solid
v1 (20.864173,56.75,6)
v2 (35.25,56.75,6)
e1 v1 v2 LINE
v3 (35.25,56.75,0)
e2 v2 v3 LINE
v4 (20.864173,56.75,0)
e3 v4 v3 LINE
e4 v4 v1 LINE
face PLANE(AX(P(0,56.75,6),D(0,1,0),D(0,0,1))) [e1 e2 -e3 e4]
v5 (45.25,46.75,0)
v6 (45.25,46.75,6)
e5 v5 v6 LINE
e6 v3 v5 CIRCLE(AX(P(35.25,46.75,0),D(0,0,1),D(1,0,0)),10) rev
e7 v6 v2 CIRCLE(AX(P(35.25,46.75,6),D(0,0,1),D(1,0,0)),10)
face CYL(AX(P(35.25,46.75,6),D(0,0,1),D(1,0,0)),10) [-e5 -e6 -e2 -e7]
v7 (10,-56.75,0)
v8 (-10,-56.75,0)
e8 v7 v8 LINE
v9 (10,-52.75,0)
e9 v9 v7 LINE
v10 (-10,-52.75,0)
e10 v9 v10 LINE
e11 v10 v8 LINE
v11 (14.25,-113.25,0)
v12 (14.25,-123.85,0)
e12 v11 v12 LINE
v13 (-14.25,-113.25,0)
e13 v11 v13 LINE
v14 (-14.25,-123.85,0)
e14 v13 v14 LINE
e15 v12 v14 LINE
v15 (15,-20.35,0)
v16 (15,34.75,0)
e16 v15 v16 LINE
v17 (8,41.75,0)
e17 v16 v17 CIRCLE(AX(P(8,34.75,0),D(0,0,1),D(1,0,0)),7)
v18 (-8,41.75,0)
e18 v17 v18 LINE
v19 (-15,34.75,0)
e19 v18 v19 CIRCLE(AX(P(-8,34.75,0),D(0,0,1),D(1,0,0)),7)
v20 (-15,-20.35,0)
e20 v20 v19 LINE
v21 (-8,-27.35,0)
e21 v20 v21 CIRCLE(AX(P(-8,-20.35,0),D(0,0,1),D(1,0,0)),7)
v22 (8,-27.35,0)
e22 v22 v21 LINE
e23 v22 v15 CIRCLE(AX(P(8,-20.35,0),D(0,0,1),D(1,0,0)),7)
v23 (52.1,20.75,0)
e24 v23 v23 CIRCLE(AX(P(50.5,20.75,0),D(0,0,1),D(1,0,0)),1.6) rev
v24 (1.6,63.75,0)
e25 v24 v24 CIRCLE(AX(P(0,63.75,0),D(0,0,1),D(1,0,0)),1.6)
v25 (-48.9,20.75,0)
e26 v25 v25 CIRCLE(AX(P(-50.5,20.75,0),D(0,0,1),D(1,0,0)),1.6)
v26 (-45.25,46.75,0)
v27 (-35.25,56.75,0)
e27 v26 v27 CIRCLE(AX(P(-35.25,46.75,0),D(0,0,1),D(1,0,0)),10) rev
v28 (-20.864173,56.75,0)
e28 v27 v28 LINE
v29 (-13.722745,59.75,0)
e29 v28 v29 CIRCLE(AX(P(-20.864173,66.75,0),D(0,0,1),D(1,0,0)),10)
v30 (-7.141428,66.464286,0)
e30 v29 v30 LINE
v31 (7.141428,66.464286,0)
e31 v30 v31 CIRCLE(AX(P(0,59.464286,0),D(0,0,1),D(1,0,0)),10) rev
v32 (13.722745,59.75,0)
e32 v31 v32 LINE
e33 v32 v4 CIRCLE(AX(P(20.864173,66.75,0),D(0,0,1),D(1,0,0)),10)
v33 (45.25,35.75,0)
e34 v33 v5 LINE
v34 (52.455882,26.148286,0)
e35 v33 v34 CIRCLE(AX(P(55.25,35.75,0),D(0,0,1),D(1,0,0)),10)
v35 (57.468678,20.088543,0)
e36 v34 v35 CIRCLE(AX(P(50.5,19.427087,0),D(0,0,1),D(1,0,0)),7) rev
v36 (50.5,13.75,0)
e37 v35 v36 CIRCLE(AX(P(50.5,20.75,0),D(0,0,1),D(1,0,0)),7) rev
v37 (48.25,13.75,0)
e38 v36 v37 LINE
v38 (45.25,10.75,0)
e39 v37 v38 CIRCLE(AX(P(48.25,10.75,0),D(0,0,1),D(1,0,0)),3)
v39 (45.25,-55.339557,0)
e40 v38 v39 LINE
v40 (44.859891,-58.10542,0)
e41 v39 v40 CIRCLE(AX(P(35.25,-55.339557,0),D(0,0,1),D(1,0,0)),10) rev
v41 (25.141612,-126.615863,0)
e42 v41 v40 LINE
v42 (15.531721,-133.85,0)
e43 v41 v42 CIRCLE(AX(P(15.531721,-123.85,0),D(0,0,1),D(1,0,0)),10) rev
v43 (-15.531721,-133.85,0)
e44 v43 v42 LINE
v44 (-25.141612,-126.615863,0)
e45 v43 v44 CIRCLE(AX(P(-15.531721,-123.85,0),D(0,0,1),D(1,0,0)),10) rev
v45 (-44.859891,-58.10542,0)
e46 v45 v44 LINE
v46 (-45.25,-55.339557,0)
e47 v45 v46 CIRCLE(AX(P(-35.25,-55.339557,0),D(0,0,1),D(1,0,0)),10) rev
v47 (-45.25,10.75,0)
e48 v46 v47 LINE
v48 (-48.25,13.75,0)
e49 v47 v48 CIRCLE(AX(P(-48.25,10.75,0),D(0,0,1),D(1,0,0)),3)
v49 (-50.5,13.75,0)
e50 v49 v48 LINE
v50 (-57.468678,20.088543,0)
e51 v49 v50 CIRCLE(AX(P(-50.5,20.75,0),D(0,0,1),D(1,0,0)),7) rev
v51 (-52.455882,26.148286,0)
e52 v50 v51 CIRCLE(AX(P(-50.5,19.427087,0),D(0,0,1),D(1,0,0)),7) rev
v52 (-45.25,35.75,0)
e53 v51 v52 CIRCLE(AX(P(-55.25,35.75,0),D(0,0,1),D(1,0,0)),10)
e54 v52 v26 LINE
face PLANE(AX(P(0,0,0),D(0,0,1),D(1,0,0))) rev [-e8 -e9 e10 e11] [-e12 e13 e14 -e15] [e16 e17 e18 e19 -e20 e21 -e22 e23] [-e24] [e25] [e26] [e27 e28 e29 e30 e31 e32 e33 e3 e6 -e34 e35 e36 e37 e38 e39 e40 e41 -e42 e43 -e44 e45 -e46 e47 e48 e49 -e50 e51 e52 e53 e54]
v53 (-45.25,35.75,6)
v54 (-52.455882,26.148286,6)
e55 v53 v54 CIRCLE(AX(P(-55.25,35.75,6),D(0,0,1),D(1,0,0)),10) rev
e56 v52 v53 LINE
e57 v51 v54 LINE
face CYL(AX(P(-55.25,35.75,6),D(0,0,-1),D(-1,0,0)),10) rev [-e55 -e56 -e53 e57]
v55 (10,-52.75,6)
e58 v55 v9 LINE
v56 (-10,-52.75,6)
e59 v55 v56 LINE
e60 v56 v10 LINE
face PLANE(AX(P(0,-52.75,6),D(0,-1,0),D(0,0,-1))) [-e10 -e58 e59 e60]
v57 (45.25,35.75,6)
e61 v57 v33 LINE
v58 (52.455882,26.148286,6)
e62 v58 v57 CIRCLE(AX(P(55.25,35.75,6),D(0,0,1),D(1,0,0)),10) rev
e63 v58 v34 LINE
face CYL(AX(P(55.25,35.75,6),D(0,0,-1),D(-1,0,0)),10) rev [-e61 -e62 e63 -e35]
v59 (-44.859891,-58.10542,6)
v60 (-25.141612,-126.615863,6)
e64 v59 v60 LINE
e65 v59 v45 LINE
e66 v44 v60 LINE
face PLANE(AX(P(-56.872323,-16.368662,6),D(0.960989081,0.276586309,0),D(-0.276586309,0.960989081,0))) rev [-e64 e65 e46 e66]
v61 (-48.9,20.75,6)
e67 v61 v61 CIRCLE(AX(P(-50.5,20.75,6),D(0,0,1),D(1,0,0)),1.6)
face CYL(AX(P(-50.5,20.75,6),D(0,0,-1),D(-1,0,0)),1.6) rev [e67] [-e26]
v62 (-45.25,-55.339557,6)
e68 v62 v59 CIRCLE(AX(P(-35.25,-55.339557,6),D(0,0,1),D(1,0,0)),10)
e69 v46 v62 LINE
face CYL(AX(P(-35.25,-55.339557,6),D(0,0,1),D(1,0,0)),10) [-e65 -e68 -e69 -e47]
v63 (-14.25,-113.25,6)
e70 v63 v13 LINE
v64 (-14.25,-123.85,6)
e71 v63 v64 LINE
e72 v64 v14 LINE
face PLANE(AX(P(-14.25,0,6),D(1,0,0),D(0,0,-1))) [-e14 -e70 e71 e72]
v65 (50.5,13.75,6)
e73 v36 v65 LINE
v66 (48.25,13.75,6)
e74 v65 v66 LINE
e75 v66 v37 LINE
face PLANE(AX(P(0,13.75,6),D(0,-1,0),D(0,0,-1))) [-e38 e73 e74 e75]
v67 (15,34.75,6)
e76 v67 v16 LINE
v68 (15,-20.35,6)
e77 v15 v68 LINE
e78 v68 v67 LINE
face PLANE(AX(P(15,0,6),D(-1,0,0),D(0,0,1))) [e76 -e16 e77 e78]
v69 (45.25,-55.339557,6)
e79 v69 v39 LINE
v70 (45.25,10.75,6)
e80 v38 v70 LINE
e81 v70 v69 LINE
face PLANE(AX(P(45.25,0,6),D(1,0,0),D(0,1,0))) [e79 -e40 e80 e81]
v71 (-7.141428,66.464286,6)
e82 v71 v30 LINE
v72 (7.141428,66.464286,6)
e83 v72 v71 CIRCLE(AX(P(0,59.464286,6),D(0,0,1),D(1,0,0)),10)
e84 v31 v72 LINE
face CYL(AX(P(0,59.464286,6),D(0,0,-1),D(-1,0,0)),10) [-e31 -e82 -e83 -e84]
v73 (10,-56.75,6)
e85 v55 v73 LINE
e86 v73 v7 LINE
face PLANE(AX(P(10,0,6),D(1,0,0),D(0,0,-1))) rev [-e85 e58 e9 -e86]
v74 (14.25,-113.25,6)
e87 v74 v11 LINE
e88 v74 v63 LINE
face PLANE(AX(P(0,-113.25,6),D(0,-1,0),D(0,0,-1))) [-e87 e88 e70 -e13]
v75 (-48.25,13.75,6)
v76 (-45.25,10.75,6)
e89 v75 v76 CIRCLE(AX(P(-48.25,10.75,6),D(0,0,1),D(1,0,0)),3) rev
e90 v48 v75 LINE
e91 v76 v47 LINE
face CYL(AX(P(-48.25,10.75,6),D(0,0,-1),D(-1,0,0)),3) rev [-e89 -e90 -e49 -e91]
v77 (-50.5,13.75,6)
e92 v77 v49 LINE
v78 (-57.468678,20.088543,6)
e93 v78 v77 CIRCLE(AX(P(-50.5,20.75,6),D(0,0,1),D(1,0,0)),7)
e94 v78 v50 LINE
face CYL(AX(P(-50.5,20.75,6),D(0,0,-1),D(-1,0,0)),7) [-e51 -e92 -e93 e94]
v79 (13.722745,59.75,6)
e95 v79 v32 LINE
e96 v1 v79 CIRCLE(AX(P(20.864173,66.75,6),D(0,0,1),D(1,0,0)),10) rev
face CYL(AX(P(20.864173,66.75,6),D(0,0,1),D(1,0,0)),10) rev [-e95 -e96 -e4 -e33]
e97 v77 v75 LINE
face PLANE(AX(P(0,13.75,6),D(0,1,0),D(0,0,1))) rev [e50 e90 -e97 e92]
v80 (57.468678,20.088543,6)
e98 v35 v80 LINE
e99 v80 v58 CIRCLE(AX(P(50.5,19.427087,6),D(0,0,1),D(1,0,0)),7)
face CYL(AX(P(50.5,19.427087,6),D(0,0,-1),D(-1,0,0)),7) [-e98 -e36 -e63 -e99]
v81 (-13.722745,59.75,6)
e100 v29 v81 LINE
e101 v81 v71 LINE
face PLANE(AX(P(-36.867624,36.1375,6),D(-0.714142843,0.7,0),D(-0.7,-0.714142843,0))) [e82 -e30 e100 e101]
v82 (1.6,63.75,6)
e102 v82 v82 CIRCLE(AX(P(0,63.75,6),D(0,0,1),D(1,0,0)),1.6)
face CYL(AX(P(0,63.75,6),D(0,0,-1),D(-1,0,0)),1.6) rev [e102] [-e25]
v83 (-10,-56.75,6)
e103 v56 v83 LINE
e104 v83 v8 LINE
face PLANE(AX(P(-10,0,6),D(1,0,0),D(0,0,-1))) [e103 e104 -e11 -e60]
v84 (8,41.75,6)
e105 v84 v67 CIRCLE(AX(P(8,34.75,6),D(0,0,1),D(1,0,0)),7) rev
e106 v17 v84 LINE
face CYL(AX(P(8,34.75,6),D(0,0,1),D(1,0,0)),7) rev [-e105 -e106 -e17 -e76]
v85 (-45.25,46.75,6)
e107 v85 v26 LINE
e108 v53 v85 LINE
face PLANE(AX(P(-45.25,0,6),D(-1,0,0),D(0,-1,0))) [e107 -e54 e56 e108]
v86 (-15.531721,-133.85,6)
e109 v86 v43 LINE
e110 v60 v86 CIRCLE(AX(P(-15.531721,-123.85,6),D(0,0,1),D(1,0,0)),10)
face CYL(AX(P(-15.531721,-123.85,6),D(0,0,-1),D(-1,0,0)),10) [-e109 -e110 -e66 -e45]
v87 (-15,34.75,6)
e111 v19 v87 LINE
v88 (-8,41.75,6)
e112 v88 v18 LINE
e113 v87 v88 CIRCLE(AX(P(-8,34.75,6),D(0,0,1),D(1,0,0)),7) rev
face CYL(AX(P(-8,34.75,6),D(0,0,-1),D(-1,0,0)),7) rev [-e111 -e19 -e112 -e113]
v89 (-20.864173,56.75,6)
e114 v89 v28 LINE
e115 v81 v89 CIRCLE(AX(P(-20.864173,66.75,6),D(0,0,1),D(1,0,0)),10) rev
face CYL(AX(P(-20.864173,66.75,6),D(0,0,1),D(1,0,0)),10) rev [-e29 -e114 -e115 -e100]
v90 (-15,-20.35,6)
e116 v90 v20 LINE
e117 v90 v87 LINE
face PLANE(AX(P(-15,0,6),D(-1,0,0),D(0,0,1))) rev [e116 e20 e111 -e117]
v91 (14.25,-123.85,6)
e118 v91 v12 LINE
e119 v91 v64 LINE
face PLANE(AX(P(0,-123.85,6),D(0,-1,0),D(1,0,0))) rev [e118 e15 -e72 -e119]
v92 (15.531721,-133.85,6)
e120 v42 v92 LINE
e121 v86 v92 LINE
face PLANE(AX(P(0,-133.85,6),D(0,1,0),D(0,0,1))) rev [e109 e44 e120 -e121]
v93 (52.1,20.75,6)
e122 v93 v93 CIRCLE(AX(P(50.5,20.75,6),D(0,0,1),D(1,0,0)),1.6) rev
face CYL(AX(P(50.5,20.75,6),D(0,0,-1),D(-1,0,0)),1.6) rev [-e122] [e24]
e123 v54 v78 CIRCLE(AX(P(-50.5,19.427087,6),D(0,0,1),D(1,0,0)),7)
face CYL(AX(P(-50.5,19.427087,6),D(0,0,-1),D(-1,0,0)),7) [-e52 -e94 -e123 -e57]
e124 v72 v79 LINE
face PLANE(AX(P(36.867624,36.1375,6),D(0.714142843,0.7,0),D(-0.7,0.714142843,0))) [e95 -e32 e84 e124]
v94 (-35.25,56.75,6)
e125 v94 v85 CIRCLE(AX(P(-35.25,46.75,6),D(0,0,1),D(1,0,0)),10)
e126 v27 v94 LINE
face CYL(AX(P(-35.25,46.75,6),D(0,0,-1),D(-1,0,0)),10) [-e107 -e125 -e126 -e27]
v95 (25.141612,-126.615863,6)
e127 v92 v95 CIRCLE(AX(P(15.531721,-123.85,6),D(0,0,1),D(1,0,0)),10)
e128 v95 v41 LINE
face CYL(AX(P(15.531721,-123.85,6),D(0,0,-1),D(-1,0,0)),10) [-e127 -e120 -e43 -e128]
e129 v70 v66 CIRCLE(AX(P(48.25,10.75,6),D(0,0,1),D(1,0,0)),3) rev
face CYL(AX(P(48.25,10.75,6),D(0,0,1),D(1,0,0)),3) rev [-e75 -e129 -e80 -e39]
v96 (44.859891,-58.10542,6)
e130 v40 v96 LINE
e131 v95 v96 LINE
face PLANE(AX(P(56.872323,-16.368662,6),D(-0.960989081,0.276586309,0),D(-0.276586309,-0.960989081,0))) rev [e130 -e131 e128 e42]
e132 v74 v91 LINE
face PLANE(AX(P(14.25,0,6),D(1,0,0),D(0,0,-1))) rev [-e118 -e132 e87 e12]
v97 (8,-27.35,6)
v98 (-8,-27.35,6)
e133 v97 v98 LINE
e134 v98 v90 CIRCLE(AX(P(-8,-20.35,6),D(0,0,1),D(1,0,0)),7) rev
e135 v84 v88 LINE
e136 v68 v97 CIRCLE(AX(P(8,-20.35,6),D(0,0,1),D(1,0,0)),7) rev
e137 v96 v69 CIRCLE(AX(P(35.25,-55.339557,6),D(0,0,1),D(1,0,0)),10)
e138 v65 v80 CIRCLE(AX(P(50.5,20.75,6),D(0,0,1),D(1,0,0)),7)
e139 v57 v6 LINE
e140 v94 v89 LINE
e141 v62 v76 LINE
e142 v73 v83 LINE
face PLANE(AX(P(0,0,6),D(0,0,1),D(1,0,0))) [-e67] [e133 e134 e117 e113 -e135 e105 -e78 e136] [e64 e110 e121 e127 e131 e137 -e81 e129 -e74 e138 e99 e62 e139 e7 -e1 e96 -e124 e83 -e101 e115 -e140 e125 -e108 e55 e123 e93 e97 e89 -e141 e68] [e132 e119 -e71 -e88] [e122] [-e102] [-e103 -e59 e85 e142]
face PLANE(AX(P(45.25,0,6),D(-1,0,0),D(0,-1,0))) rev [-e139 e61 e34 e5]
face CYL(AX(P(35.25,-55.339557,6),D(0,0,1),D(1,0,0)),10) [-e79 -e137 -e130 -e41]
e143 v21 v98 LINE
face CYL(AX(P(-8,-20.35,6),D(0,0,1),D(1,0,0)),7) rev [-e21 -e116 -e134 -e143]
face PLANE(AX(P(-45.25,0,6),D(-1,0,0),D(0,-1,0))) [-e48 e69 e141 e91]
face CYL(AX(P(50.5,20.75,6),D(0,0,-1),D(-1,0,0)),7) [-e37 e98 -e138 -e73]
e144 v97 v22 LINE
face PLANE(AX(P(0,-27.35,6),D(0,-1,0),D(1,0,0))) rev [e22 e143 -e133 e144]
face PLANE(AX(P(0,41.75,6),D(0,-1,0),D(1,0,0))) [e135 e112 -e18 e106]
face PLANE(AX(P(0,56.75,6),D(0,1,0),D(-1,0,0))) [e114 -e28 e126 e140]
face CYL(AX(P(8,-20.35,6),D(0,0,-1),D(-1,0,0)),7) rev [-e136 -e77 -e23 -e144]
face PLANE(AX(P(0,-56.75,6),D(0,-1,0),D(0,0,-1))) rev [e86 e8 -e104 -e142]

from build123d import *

# Parameters (mm, degrees)
ESBO_O1_R                = 1.6
ESBO_O1_W                = 28.5
ESBO_O1_H                = 10.6
ESBO_O1_W_2              = 30
ESBO_O1_H_2              = 69.1
ESBO_O1_W_3              = 20
ESBO_O1_H_3              = 4
RESSALTO_EXTRUS_O1_DEPTH = 6
FILETE3_R                = 3
FILETE4_R                = 10
FILETE5_R                = 7


with BuildPart() as part:
    # Esboço1 → Ressalto-extrusão1 (new body)
    with BuildSketch(Plane.XY):
        Polygon((-45.25, -56.75), (-23.05952475, -133.85), (23.05952475, -133.85), (45.25, -56.75), (45.25, 13.75), (57.5, 13.75), (57.5, 25.75), (45.25, 25.75), (45.25, 56.75), (16.663333, 56.75), (0, 73.75), (-16.663333, 56.75), (-45.25, 56.75), (-45.25, 25.75), (-57.5, 25.75), (-57.5, 13.75), (-45.25, 13.75), align=None)
        with Locations((0, 63.75)):
            Circle(ESBO_O1_R, mode=Mode.SUBTRACT)
        with Locations((-50.5, 20.75)):
            Circle(ESBO_O1_R, mode=Mode.SUBTRACT)
        with Locations((50.5, 20.75)):
            Circle(ESBO_O1_R, mode=Mode.SUBTRACT)
        with Locations((0, -118.55)):
            Rectangle(ESBO_O1_W, ESBO_O1_H, mode=Mode.SUBTRACT)
        with Locations((0, 7.2)):
            Rectangle(ESBO_O1_W_2, ESBO_O1_H_2, mode=Mode.SUBTRACT)
        with Locations((0, -54.75)):
            Rectangle(ESBO_O1_W_3, ESBO_O1_H_3, mode=Mode.SUBTRACT)
    extrude(amount=RESSALTO_EXTRUS_O1_DEPTH)

    # Filete3
    filete3_edges = [part.edges().sort_by_distance(p)[0] for p in [
        (-45.25, 13.75, 3),
        (45.25, 13.75, 3),
    ]]
    fillet(filete3_edges, radius=FILETE3_R)

    # Filete4
    filete4_edges = [part.edges().sort_by_distance(p)[0] for p in [
        (-45.25, 25.75, 3),
        (-45.25, 56.75, 3),
        (-16.663333, 56.75, 3),
        (0, 73.75, 3),
        (16.663333, 56.75, 3),
        (45.25, 56.75, 3),
        (45.25, 25.75, 3),
        (45.25, -56.75, 3),
        (23.05952475, -133.85, 3),
        (-23.05952475, -133.85, 3),
        (-45.25, -56.75, 3),
    ]]
    fillet(filete4_edges, radius=FILETE4_R)

    # Filete5
    # the kernel refuses this fillet: 7 mm, written as the material it adds along each edge
    with BuildSketch(Plane(origin=(-15, -27.35, 0), x_dir=(1, 0, 0), z_dir=(0, 0, 1)), Plane(origin=(15, 41.75, 0), x_dir=(-1, 0, 0), z_dir=(0, 0, 1)), Plane(origin=(-15, 41.75, 0), x_dir=(0, -1, 0), z_dir=(0, 0, 1))) as filete5_piece_1:
        with BuildLine():
            CenterArc((FILETE5_R, FILETE5_R), FILETE5_R, 180, 90)
            Line((0, FILETE5_R), (0, 0))
            Line((0, 0), (FILETE5_R, 0))
        make_face()
    extrude(amount=6)
    with BuildSketch(Plane(origin=(15, -27.35, 0), x_dir=(-1, 0, 0), z_dir=(0, 0, 1))) as filete5_piece_2:
        with BuildLine():
            CenterArc((FILETE5_R, -FILETE5_R), FILETE5_R, 90, 90)
            Line((0, -FILETE5_R), (0, 0))
            Line((0, 0), (FILETE5_R, 0))
        make_face()
    extrude(amount=6)
    # the kernel refuses this fillet: 7 mm, written as the material it takes off along each edge
    with BuildSketch(Plane(origin=(57.5, 13.75, -17.5), x_dir=(-1, 0, 0), z_dir=(0, 0, 1))) as filete5_2_piece_1:
        with BuildLine():
            CenterArc((FILETE5_R, -FILETE5_R), FILETE5_R, 90, 90)
            Line((0, -FILETE5_R), (0, 0))
            Line((0, 0), (FILETE5_R, 0))
        make_face()
    extrude(amount=41, mode=Mode.SUBTRACT)
    with BuildSketch(Plane(origin=(57.5, 25.75, -15.807283357), x_dir=(0, -1, 0), z_dir=(0, 0, 1))) as filete5_2_piece_2:
        with BuildLine():
            CenterArc((6.322913343, -7), FILETE5_R, 90, 73.774899865)
            Line((-0.398286269, -5.044117647), (-1.07040623, -4.848529412))
            ThreePointArc((-1.07040623, -4.848529412), (-0.7, -2.25), (-0.7, 0))
            Line((-0.7, 0), (0, 0.7))
            Line((0, 0.7), (6.322913343, 0.7))
            Line((6.322913343, 0.7), (6.322913343, 0))
        make_face()
    extrude(amount=37.614566715, mode=Mode.SUBTRACT)
    with BuildSketch(Plane(origin=(-57.5, 13.75, -17.5), x_dir=(1, 0, 0), z_dir=(0, 0, 1))) as filete5_2_piece_3:
        with BuildLine():
            CenterArc((FILETE5_R, FILETE5_R), FILETE5_R, 180, 90)
            Line((0, FILETE5_R), (0, 0))
            Line((0, 0), (FILETE5_R, 0))
        make_face()
    extrude(amount=41, mode=Mode.SUBTRACT)
    with BuildSketch(Plane(origin=(-57.5, 25.75, -15.807283357), x_dir=(0, -1, 0), z_dir=(0, 0, 1))) as filete5_2_piece_4:
        with BuildLine():
            CenterArc((6.322913343, 7), FILETE5_R, 196.225100135, 73.774899865)
            Line((-0.398286269, 5.044117647), (-1.07040623, 4.848529412))
            ThreePointArc((-1.07040623, 4.848529412), (-0.7, 2.25), (-0.7, 0))
            Line((-0.7, 0), (0, -0.7))
            Line((0, -0.7), (6.322913343, -0.7))
            Line((6.322913343, -0.7), (6.322913343, 0))
        make_face()
    extrude(amount=37.614566715, mode=Mode.SUBTRACT)


solid = part.part
